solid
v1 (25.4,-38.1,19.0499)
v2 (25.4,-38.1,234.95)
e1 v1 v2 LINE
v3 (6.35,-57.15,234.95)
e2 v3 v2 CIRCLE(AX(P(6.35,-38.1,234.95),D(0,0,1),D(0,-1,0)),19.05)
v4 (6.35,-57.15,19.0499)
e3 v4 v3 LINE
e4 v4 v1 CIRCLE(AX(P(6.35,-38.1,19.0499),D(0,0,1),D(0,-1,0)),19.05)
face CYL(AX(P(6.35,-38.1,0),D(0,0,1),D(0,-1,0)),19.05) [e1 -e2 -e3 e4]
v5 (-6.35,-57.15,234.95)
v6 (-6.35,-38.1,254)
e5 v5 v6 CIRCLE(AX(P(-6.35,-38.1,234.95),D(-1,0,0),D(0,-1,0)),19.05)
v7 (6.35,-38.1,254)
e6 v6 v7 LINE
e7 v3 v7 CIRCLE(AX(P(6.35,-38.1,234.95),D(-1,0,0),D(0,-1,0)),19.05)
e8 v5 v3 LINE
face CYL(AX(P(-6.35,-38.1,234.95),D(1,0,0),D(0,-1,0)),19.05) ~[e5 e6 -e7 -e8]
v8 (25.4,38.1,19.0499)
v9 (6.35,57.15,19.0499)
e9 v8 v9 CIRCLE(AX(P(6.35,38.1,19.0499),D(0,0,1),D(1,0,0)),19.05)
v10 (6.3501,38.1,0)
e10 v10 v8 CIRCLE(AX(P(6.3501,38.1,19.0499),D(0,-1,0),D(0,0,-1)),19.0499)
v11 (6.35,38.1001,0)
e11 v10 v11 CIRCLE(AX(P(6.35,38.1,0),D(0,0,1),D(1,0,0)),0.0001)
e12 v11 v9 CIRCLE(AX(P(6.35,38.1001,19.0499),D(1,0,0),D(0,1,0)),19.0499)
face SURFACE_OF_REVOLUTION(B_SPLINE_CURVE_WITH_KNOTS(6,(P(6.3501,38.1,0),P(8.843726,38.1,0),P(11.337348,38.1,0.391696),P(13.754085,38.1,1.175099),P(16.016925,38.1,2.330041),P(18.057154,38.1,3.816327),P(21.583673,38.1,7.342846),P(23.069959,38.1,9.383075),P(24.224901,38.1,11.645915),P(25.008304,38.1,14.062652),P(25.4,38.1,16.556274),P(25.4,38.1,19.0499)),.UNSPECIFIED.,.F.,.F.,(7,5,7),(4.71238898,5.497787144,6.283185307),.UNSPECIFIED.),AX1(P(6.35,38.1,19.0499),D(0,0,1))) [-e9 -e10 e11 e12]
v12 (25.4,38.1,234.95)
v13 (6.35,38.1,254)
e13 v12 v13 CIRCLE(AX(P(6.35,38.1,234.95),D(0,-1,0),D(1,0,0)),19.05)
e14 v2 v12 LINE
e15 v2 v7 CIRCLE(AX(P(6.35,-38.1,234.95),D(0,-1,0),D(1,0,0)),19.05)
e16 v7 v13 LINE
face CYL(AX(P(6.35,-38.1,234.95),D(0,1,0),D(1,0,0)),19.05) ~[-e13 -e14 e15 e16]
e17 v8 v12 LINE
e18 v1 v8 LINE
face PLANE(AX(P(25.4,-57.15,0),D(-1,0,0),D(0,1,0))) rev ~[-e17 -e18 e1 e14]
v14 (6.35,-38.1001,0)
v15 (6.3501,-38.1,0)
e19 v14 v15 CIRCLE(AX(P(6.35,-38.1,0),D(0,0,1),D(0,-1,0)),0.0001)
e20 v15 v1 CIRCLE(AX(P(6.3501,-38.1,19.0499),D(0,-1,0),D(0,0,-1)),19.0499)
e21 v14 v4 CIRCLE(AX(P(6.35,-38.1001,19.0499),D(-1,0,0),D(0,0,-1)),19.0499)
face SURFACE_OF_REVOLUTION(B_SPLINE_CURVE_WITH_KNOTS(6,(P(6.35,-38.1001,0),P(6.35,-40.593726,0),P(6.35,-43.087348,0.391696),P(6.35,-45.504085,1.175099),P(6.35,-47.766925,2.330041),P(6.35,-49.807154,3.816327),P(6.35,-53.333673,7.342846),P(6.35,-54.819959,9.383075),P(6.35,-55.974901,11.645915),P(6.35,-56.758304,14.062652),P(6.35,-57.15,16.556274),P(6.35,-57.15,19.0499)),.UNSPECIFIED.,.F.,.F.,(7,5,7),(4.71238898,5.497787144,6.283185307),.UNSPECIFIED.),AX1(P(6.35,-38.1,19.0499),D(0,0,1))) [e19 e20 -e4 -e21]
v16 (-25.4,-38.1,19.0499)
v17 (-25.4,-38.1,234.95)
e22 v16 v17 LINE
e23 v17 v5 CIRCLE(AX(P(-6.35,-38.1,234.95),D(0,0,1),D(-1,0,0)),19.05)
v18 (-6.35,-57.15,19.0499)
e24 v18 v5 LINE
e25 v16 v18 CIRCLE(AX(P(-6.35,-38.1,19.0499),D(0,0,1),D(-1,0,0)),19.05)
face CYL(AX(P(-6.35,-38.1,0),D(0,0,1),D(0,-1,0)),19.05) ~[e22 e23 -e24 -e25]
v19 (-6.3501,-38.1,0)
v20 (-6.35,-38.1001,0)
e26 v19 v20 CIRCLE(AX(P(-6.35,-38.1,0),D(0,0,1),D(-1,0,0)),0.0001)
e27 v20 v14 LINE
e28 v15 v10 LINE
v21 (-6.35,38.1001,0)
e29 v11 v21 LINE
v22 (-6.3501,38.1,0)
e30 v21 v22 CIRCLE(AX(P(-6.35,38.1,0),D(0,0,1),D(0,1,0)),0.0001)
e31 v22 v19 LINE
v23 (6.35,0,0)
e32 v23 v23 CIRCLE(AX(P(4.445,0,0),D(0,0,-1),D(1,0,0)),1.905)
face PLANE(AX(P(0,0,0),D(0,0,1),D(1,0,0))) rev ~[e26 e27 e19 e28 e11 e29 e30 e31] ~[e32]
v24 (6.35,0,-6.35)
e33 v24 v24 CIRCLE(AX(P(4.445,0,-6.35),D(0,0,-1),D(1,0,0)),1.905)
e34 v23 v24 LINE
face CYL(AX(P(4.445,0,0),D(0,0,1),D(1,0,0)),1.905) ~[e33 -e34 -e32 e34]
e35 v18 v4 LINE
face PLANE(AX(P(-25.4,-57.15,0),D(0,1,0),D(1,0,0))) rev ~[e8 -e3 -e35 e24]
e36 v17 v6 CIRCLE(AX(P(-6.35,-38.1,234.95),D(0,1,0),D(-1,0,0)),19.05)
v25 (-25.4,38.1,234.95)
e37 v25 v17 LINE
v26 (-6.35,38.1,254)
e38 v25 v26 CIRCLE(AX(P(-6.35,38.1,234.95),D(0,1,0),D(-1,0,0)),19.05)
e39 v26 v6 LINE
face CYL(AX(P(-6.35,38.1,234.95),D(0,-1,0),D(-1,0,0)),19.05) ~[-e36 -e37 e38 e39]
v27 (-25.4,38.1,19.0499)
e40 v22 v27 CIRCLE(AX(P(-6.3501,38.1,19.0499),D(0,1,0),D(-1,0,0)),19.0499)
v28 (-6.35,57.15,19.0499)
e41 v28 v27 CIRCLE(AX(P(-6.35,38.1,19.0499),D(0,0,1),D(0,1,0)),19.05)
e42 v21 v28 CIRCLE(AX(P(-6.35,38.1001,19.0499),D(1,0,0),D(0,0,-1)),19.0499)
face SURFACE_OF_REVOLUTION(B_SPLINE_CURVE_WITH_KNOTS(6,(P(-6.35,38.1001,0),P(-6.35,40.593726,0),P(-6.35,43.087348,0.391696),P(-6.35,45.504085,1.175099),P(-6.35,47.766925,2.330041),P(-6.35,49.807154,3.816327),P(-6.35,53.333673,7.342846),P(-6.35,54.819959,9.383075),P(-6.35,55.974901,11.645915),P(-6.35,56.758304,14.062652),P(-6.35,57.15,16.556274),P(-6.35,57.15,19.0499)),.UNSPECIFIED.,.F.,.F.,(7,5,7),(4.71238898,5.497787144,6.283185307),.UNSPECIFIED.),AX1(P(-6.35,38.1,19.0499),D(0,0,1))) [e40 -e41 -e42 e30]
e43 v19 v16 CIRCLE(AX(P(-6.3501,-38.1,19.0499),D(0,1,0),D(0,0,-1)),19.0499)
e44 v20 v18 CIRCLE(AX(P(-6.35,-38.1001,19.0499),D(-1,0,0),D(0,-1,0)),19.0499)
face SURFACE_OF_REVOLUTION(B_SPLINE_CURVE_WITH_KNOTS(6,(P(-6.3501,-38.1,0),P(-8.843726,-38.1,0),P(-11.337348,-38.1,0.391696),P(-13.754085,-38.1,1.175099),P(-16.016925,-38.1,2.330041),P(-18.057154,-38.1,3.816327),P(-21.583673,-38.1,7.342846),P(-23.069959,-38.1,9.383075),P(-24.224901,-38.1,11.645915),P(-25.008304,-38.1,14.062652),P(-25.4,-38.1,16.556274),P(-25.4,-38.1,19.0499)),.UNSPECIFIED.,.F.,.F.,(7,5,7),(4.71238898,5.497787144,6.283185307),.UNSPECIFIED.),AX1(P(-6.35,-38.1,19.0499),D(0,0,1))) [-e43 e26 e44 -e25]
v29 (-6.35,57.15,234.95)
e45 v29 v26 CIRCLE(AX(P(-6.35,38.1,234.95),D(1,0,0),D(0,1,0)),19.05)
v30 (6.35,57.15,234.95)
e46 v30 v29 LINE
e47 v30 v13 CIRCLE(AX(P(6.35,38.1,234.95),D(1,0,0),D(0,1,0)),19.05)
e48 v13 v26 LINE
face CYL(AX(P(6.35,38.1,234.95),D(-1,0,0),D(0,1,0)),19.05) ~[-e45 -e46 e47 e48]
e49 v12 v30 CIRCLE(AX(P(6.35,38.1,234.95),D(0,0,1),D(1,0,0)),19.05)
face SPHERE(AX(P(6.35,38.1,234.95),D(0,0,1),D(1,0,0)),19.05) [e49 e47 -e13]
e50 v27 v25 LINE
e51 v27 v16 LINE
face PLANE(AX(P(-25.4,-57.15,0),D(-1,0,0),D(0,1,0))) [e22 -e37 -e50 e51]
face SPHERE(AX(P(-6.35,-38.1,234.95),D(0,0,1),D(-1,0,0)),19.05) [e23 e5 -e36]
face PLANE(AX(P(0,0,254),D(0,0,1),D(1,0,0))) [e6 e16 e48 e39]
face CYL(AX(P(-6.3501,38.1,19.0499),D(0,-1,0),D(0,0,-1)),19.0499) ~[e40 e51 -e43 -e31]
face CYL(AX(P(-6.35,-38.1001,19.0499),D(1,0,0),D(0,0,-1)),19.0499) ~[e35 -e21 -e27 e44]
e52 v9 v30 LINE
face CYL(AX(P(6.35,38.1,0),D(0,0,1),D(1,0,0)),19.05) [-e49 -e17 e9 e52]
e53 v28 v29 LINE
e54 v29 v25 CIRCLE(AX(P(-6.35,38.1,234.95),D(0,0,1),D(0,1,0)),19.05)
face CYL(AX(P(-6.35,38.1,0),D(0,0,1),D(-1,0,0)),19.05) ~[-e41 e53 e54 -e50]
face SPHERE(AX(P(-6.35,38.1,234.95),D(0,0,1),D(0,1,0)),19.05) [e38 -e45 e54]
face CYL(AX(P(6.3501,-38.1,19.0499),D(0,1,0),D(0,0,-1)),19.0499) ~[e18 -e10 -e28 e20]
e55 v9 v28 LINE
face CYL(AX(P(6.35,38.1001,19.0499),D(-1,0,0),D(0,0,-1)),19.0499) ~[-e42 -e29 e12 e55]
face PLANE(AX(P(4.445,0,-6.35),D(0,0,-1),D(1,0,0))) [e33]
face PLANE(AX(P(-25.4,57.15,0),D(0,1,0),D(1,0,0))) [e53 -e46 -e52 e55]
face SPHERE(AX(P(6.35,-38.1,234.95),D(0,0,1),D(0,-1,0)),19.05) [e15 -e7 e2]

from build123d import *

# Parameters (mm, degrees)
F0_W     = 50.8
F0_H     = 114.3
F1_DEPTH = 254
F2_R     = 1.905
F3_DEPTH = 6.35
F4_F1_R  = 19.05
F4_F2_R  = 19.05
F4_F3_R  = 19.05
F4_F4_R  = 19.05
F4_F5_R  = 19.0499
F4_F6_R  = 19.05


# Not quite as in the source:
# - a fillet or chamfer is up to 0.001 mm smaller than in the source, because OpenCascade refuses the exact size


with BuildPart() as f1:
    # F0 (on Top) → F1 (new body)
    with BuildSketch(Plane.XY):
        Rectangle(F0_W, F0_H)
    extrude(amount=F1_DEPTH)

    # F2 (on face) → F3 (join)
    with BuildSketch(Plane(origin=(0, 0, 0), x_dir=(1, 0, 0), z_dir=(0, 0, -1))):
        with Locations((4.445, 0)):
            Circle(F2_R)
    extrude(amount=F3_DEPTH)

    # F4: fillet of radius 19.05 on 12 edges, made by hand

    # F4_f1
    f4_f1_edges = [f1.edges().sort_by_distance(p)[0] for p in [
        (25.4, -57.15, 127),
    ]]
    fillet(f4_f1_edges, radius=F4_F1_R)

    # F4_f2
    f4_f2_edges = [f1.edges().sort_by_distance(p)[0] for p in [
        (25.4, 57.15, 127),
    ]]
    fillet(f4_f2_edges, radius=F4_F2_R)

    # F4_f3
    f4_f3_edges = [f1.edges().sort_by_distance(p)[0] for p in [
        (-25.4, -57.15, 127),
    ]]
    fillet(f4_f3_edges, radius=F4_F3_R)

    # F4_f4
    f4_f4_edges = [f1.edges().sort_by_distance(p)[0] for p in [
        (-25.4, 57.15, 127),
    ]]
    fillet(f4_f4_edges, radius=F4_F4_R)

    # F4_f5 (radius 19.05 in the source; OpenCascade refuses exactly that, so slightly less here)
    f4_f5_edges = [f1.edges().sort_by_distance(p)[0] for p in [
        (25.4, 0, 0),
    ]]
    fillet(f4_f5_edges, radius=F4_F5_R)

    # F4_f6
    f4_f6_edges = [f1.edges().sort_by_distance(p)[0] for p in [
        (25.4, 0, 254),
    ]]
    fillet(f4_f6_edges, radius=F4_F6_R)


solid = f1.part
